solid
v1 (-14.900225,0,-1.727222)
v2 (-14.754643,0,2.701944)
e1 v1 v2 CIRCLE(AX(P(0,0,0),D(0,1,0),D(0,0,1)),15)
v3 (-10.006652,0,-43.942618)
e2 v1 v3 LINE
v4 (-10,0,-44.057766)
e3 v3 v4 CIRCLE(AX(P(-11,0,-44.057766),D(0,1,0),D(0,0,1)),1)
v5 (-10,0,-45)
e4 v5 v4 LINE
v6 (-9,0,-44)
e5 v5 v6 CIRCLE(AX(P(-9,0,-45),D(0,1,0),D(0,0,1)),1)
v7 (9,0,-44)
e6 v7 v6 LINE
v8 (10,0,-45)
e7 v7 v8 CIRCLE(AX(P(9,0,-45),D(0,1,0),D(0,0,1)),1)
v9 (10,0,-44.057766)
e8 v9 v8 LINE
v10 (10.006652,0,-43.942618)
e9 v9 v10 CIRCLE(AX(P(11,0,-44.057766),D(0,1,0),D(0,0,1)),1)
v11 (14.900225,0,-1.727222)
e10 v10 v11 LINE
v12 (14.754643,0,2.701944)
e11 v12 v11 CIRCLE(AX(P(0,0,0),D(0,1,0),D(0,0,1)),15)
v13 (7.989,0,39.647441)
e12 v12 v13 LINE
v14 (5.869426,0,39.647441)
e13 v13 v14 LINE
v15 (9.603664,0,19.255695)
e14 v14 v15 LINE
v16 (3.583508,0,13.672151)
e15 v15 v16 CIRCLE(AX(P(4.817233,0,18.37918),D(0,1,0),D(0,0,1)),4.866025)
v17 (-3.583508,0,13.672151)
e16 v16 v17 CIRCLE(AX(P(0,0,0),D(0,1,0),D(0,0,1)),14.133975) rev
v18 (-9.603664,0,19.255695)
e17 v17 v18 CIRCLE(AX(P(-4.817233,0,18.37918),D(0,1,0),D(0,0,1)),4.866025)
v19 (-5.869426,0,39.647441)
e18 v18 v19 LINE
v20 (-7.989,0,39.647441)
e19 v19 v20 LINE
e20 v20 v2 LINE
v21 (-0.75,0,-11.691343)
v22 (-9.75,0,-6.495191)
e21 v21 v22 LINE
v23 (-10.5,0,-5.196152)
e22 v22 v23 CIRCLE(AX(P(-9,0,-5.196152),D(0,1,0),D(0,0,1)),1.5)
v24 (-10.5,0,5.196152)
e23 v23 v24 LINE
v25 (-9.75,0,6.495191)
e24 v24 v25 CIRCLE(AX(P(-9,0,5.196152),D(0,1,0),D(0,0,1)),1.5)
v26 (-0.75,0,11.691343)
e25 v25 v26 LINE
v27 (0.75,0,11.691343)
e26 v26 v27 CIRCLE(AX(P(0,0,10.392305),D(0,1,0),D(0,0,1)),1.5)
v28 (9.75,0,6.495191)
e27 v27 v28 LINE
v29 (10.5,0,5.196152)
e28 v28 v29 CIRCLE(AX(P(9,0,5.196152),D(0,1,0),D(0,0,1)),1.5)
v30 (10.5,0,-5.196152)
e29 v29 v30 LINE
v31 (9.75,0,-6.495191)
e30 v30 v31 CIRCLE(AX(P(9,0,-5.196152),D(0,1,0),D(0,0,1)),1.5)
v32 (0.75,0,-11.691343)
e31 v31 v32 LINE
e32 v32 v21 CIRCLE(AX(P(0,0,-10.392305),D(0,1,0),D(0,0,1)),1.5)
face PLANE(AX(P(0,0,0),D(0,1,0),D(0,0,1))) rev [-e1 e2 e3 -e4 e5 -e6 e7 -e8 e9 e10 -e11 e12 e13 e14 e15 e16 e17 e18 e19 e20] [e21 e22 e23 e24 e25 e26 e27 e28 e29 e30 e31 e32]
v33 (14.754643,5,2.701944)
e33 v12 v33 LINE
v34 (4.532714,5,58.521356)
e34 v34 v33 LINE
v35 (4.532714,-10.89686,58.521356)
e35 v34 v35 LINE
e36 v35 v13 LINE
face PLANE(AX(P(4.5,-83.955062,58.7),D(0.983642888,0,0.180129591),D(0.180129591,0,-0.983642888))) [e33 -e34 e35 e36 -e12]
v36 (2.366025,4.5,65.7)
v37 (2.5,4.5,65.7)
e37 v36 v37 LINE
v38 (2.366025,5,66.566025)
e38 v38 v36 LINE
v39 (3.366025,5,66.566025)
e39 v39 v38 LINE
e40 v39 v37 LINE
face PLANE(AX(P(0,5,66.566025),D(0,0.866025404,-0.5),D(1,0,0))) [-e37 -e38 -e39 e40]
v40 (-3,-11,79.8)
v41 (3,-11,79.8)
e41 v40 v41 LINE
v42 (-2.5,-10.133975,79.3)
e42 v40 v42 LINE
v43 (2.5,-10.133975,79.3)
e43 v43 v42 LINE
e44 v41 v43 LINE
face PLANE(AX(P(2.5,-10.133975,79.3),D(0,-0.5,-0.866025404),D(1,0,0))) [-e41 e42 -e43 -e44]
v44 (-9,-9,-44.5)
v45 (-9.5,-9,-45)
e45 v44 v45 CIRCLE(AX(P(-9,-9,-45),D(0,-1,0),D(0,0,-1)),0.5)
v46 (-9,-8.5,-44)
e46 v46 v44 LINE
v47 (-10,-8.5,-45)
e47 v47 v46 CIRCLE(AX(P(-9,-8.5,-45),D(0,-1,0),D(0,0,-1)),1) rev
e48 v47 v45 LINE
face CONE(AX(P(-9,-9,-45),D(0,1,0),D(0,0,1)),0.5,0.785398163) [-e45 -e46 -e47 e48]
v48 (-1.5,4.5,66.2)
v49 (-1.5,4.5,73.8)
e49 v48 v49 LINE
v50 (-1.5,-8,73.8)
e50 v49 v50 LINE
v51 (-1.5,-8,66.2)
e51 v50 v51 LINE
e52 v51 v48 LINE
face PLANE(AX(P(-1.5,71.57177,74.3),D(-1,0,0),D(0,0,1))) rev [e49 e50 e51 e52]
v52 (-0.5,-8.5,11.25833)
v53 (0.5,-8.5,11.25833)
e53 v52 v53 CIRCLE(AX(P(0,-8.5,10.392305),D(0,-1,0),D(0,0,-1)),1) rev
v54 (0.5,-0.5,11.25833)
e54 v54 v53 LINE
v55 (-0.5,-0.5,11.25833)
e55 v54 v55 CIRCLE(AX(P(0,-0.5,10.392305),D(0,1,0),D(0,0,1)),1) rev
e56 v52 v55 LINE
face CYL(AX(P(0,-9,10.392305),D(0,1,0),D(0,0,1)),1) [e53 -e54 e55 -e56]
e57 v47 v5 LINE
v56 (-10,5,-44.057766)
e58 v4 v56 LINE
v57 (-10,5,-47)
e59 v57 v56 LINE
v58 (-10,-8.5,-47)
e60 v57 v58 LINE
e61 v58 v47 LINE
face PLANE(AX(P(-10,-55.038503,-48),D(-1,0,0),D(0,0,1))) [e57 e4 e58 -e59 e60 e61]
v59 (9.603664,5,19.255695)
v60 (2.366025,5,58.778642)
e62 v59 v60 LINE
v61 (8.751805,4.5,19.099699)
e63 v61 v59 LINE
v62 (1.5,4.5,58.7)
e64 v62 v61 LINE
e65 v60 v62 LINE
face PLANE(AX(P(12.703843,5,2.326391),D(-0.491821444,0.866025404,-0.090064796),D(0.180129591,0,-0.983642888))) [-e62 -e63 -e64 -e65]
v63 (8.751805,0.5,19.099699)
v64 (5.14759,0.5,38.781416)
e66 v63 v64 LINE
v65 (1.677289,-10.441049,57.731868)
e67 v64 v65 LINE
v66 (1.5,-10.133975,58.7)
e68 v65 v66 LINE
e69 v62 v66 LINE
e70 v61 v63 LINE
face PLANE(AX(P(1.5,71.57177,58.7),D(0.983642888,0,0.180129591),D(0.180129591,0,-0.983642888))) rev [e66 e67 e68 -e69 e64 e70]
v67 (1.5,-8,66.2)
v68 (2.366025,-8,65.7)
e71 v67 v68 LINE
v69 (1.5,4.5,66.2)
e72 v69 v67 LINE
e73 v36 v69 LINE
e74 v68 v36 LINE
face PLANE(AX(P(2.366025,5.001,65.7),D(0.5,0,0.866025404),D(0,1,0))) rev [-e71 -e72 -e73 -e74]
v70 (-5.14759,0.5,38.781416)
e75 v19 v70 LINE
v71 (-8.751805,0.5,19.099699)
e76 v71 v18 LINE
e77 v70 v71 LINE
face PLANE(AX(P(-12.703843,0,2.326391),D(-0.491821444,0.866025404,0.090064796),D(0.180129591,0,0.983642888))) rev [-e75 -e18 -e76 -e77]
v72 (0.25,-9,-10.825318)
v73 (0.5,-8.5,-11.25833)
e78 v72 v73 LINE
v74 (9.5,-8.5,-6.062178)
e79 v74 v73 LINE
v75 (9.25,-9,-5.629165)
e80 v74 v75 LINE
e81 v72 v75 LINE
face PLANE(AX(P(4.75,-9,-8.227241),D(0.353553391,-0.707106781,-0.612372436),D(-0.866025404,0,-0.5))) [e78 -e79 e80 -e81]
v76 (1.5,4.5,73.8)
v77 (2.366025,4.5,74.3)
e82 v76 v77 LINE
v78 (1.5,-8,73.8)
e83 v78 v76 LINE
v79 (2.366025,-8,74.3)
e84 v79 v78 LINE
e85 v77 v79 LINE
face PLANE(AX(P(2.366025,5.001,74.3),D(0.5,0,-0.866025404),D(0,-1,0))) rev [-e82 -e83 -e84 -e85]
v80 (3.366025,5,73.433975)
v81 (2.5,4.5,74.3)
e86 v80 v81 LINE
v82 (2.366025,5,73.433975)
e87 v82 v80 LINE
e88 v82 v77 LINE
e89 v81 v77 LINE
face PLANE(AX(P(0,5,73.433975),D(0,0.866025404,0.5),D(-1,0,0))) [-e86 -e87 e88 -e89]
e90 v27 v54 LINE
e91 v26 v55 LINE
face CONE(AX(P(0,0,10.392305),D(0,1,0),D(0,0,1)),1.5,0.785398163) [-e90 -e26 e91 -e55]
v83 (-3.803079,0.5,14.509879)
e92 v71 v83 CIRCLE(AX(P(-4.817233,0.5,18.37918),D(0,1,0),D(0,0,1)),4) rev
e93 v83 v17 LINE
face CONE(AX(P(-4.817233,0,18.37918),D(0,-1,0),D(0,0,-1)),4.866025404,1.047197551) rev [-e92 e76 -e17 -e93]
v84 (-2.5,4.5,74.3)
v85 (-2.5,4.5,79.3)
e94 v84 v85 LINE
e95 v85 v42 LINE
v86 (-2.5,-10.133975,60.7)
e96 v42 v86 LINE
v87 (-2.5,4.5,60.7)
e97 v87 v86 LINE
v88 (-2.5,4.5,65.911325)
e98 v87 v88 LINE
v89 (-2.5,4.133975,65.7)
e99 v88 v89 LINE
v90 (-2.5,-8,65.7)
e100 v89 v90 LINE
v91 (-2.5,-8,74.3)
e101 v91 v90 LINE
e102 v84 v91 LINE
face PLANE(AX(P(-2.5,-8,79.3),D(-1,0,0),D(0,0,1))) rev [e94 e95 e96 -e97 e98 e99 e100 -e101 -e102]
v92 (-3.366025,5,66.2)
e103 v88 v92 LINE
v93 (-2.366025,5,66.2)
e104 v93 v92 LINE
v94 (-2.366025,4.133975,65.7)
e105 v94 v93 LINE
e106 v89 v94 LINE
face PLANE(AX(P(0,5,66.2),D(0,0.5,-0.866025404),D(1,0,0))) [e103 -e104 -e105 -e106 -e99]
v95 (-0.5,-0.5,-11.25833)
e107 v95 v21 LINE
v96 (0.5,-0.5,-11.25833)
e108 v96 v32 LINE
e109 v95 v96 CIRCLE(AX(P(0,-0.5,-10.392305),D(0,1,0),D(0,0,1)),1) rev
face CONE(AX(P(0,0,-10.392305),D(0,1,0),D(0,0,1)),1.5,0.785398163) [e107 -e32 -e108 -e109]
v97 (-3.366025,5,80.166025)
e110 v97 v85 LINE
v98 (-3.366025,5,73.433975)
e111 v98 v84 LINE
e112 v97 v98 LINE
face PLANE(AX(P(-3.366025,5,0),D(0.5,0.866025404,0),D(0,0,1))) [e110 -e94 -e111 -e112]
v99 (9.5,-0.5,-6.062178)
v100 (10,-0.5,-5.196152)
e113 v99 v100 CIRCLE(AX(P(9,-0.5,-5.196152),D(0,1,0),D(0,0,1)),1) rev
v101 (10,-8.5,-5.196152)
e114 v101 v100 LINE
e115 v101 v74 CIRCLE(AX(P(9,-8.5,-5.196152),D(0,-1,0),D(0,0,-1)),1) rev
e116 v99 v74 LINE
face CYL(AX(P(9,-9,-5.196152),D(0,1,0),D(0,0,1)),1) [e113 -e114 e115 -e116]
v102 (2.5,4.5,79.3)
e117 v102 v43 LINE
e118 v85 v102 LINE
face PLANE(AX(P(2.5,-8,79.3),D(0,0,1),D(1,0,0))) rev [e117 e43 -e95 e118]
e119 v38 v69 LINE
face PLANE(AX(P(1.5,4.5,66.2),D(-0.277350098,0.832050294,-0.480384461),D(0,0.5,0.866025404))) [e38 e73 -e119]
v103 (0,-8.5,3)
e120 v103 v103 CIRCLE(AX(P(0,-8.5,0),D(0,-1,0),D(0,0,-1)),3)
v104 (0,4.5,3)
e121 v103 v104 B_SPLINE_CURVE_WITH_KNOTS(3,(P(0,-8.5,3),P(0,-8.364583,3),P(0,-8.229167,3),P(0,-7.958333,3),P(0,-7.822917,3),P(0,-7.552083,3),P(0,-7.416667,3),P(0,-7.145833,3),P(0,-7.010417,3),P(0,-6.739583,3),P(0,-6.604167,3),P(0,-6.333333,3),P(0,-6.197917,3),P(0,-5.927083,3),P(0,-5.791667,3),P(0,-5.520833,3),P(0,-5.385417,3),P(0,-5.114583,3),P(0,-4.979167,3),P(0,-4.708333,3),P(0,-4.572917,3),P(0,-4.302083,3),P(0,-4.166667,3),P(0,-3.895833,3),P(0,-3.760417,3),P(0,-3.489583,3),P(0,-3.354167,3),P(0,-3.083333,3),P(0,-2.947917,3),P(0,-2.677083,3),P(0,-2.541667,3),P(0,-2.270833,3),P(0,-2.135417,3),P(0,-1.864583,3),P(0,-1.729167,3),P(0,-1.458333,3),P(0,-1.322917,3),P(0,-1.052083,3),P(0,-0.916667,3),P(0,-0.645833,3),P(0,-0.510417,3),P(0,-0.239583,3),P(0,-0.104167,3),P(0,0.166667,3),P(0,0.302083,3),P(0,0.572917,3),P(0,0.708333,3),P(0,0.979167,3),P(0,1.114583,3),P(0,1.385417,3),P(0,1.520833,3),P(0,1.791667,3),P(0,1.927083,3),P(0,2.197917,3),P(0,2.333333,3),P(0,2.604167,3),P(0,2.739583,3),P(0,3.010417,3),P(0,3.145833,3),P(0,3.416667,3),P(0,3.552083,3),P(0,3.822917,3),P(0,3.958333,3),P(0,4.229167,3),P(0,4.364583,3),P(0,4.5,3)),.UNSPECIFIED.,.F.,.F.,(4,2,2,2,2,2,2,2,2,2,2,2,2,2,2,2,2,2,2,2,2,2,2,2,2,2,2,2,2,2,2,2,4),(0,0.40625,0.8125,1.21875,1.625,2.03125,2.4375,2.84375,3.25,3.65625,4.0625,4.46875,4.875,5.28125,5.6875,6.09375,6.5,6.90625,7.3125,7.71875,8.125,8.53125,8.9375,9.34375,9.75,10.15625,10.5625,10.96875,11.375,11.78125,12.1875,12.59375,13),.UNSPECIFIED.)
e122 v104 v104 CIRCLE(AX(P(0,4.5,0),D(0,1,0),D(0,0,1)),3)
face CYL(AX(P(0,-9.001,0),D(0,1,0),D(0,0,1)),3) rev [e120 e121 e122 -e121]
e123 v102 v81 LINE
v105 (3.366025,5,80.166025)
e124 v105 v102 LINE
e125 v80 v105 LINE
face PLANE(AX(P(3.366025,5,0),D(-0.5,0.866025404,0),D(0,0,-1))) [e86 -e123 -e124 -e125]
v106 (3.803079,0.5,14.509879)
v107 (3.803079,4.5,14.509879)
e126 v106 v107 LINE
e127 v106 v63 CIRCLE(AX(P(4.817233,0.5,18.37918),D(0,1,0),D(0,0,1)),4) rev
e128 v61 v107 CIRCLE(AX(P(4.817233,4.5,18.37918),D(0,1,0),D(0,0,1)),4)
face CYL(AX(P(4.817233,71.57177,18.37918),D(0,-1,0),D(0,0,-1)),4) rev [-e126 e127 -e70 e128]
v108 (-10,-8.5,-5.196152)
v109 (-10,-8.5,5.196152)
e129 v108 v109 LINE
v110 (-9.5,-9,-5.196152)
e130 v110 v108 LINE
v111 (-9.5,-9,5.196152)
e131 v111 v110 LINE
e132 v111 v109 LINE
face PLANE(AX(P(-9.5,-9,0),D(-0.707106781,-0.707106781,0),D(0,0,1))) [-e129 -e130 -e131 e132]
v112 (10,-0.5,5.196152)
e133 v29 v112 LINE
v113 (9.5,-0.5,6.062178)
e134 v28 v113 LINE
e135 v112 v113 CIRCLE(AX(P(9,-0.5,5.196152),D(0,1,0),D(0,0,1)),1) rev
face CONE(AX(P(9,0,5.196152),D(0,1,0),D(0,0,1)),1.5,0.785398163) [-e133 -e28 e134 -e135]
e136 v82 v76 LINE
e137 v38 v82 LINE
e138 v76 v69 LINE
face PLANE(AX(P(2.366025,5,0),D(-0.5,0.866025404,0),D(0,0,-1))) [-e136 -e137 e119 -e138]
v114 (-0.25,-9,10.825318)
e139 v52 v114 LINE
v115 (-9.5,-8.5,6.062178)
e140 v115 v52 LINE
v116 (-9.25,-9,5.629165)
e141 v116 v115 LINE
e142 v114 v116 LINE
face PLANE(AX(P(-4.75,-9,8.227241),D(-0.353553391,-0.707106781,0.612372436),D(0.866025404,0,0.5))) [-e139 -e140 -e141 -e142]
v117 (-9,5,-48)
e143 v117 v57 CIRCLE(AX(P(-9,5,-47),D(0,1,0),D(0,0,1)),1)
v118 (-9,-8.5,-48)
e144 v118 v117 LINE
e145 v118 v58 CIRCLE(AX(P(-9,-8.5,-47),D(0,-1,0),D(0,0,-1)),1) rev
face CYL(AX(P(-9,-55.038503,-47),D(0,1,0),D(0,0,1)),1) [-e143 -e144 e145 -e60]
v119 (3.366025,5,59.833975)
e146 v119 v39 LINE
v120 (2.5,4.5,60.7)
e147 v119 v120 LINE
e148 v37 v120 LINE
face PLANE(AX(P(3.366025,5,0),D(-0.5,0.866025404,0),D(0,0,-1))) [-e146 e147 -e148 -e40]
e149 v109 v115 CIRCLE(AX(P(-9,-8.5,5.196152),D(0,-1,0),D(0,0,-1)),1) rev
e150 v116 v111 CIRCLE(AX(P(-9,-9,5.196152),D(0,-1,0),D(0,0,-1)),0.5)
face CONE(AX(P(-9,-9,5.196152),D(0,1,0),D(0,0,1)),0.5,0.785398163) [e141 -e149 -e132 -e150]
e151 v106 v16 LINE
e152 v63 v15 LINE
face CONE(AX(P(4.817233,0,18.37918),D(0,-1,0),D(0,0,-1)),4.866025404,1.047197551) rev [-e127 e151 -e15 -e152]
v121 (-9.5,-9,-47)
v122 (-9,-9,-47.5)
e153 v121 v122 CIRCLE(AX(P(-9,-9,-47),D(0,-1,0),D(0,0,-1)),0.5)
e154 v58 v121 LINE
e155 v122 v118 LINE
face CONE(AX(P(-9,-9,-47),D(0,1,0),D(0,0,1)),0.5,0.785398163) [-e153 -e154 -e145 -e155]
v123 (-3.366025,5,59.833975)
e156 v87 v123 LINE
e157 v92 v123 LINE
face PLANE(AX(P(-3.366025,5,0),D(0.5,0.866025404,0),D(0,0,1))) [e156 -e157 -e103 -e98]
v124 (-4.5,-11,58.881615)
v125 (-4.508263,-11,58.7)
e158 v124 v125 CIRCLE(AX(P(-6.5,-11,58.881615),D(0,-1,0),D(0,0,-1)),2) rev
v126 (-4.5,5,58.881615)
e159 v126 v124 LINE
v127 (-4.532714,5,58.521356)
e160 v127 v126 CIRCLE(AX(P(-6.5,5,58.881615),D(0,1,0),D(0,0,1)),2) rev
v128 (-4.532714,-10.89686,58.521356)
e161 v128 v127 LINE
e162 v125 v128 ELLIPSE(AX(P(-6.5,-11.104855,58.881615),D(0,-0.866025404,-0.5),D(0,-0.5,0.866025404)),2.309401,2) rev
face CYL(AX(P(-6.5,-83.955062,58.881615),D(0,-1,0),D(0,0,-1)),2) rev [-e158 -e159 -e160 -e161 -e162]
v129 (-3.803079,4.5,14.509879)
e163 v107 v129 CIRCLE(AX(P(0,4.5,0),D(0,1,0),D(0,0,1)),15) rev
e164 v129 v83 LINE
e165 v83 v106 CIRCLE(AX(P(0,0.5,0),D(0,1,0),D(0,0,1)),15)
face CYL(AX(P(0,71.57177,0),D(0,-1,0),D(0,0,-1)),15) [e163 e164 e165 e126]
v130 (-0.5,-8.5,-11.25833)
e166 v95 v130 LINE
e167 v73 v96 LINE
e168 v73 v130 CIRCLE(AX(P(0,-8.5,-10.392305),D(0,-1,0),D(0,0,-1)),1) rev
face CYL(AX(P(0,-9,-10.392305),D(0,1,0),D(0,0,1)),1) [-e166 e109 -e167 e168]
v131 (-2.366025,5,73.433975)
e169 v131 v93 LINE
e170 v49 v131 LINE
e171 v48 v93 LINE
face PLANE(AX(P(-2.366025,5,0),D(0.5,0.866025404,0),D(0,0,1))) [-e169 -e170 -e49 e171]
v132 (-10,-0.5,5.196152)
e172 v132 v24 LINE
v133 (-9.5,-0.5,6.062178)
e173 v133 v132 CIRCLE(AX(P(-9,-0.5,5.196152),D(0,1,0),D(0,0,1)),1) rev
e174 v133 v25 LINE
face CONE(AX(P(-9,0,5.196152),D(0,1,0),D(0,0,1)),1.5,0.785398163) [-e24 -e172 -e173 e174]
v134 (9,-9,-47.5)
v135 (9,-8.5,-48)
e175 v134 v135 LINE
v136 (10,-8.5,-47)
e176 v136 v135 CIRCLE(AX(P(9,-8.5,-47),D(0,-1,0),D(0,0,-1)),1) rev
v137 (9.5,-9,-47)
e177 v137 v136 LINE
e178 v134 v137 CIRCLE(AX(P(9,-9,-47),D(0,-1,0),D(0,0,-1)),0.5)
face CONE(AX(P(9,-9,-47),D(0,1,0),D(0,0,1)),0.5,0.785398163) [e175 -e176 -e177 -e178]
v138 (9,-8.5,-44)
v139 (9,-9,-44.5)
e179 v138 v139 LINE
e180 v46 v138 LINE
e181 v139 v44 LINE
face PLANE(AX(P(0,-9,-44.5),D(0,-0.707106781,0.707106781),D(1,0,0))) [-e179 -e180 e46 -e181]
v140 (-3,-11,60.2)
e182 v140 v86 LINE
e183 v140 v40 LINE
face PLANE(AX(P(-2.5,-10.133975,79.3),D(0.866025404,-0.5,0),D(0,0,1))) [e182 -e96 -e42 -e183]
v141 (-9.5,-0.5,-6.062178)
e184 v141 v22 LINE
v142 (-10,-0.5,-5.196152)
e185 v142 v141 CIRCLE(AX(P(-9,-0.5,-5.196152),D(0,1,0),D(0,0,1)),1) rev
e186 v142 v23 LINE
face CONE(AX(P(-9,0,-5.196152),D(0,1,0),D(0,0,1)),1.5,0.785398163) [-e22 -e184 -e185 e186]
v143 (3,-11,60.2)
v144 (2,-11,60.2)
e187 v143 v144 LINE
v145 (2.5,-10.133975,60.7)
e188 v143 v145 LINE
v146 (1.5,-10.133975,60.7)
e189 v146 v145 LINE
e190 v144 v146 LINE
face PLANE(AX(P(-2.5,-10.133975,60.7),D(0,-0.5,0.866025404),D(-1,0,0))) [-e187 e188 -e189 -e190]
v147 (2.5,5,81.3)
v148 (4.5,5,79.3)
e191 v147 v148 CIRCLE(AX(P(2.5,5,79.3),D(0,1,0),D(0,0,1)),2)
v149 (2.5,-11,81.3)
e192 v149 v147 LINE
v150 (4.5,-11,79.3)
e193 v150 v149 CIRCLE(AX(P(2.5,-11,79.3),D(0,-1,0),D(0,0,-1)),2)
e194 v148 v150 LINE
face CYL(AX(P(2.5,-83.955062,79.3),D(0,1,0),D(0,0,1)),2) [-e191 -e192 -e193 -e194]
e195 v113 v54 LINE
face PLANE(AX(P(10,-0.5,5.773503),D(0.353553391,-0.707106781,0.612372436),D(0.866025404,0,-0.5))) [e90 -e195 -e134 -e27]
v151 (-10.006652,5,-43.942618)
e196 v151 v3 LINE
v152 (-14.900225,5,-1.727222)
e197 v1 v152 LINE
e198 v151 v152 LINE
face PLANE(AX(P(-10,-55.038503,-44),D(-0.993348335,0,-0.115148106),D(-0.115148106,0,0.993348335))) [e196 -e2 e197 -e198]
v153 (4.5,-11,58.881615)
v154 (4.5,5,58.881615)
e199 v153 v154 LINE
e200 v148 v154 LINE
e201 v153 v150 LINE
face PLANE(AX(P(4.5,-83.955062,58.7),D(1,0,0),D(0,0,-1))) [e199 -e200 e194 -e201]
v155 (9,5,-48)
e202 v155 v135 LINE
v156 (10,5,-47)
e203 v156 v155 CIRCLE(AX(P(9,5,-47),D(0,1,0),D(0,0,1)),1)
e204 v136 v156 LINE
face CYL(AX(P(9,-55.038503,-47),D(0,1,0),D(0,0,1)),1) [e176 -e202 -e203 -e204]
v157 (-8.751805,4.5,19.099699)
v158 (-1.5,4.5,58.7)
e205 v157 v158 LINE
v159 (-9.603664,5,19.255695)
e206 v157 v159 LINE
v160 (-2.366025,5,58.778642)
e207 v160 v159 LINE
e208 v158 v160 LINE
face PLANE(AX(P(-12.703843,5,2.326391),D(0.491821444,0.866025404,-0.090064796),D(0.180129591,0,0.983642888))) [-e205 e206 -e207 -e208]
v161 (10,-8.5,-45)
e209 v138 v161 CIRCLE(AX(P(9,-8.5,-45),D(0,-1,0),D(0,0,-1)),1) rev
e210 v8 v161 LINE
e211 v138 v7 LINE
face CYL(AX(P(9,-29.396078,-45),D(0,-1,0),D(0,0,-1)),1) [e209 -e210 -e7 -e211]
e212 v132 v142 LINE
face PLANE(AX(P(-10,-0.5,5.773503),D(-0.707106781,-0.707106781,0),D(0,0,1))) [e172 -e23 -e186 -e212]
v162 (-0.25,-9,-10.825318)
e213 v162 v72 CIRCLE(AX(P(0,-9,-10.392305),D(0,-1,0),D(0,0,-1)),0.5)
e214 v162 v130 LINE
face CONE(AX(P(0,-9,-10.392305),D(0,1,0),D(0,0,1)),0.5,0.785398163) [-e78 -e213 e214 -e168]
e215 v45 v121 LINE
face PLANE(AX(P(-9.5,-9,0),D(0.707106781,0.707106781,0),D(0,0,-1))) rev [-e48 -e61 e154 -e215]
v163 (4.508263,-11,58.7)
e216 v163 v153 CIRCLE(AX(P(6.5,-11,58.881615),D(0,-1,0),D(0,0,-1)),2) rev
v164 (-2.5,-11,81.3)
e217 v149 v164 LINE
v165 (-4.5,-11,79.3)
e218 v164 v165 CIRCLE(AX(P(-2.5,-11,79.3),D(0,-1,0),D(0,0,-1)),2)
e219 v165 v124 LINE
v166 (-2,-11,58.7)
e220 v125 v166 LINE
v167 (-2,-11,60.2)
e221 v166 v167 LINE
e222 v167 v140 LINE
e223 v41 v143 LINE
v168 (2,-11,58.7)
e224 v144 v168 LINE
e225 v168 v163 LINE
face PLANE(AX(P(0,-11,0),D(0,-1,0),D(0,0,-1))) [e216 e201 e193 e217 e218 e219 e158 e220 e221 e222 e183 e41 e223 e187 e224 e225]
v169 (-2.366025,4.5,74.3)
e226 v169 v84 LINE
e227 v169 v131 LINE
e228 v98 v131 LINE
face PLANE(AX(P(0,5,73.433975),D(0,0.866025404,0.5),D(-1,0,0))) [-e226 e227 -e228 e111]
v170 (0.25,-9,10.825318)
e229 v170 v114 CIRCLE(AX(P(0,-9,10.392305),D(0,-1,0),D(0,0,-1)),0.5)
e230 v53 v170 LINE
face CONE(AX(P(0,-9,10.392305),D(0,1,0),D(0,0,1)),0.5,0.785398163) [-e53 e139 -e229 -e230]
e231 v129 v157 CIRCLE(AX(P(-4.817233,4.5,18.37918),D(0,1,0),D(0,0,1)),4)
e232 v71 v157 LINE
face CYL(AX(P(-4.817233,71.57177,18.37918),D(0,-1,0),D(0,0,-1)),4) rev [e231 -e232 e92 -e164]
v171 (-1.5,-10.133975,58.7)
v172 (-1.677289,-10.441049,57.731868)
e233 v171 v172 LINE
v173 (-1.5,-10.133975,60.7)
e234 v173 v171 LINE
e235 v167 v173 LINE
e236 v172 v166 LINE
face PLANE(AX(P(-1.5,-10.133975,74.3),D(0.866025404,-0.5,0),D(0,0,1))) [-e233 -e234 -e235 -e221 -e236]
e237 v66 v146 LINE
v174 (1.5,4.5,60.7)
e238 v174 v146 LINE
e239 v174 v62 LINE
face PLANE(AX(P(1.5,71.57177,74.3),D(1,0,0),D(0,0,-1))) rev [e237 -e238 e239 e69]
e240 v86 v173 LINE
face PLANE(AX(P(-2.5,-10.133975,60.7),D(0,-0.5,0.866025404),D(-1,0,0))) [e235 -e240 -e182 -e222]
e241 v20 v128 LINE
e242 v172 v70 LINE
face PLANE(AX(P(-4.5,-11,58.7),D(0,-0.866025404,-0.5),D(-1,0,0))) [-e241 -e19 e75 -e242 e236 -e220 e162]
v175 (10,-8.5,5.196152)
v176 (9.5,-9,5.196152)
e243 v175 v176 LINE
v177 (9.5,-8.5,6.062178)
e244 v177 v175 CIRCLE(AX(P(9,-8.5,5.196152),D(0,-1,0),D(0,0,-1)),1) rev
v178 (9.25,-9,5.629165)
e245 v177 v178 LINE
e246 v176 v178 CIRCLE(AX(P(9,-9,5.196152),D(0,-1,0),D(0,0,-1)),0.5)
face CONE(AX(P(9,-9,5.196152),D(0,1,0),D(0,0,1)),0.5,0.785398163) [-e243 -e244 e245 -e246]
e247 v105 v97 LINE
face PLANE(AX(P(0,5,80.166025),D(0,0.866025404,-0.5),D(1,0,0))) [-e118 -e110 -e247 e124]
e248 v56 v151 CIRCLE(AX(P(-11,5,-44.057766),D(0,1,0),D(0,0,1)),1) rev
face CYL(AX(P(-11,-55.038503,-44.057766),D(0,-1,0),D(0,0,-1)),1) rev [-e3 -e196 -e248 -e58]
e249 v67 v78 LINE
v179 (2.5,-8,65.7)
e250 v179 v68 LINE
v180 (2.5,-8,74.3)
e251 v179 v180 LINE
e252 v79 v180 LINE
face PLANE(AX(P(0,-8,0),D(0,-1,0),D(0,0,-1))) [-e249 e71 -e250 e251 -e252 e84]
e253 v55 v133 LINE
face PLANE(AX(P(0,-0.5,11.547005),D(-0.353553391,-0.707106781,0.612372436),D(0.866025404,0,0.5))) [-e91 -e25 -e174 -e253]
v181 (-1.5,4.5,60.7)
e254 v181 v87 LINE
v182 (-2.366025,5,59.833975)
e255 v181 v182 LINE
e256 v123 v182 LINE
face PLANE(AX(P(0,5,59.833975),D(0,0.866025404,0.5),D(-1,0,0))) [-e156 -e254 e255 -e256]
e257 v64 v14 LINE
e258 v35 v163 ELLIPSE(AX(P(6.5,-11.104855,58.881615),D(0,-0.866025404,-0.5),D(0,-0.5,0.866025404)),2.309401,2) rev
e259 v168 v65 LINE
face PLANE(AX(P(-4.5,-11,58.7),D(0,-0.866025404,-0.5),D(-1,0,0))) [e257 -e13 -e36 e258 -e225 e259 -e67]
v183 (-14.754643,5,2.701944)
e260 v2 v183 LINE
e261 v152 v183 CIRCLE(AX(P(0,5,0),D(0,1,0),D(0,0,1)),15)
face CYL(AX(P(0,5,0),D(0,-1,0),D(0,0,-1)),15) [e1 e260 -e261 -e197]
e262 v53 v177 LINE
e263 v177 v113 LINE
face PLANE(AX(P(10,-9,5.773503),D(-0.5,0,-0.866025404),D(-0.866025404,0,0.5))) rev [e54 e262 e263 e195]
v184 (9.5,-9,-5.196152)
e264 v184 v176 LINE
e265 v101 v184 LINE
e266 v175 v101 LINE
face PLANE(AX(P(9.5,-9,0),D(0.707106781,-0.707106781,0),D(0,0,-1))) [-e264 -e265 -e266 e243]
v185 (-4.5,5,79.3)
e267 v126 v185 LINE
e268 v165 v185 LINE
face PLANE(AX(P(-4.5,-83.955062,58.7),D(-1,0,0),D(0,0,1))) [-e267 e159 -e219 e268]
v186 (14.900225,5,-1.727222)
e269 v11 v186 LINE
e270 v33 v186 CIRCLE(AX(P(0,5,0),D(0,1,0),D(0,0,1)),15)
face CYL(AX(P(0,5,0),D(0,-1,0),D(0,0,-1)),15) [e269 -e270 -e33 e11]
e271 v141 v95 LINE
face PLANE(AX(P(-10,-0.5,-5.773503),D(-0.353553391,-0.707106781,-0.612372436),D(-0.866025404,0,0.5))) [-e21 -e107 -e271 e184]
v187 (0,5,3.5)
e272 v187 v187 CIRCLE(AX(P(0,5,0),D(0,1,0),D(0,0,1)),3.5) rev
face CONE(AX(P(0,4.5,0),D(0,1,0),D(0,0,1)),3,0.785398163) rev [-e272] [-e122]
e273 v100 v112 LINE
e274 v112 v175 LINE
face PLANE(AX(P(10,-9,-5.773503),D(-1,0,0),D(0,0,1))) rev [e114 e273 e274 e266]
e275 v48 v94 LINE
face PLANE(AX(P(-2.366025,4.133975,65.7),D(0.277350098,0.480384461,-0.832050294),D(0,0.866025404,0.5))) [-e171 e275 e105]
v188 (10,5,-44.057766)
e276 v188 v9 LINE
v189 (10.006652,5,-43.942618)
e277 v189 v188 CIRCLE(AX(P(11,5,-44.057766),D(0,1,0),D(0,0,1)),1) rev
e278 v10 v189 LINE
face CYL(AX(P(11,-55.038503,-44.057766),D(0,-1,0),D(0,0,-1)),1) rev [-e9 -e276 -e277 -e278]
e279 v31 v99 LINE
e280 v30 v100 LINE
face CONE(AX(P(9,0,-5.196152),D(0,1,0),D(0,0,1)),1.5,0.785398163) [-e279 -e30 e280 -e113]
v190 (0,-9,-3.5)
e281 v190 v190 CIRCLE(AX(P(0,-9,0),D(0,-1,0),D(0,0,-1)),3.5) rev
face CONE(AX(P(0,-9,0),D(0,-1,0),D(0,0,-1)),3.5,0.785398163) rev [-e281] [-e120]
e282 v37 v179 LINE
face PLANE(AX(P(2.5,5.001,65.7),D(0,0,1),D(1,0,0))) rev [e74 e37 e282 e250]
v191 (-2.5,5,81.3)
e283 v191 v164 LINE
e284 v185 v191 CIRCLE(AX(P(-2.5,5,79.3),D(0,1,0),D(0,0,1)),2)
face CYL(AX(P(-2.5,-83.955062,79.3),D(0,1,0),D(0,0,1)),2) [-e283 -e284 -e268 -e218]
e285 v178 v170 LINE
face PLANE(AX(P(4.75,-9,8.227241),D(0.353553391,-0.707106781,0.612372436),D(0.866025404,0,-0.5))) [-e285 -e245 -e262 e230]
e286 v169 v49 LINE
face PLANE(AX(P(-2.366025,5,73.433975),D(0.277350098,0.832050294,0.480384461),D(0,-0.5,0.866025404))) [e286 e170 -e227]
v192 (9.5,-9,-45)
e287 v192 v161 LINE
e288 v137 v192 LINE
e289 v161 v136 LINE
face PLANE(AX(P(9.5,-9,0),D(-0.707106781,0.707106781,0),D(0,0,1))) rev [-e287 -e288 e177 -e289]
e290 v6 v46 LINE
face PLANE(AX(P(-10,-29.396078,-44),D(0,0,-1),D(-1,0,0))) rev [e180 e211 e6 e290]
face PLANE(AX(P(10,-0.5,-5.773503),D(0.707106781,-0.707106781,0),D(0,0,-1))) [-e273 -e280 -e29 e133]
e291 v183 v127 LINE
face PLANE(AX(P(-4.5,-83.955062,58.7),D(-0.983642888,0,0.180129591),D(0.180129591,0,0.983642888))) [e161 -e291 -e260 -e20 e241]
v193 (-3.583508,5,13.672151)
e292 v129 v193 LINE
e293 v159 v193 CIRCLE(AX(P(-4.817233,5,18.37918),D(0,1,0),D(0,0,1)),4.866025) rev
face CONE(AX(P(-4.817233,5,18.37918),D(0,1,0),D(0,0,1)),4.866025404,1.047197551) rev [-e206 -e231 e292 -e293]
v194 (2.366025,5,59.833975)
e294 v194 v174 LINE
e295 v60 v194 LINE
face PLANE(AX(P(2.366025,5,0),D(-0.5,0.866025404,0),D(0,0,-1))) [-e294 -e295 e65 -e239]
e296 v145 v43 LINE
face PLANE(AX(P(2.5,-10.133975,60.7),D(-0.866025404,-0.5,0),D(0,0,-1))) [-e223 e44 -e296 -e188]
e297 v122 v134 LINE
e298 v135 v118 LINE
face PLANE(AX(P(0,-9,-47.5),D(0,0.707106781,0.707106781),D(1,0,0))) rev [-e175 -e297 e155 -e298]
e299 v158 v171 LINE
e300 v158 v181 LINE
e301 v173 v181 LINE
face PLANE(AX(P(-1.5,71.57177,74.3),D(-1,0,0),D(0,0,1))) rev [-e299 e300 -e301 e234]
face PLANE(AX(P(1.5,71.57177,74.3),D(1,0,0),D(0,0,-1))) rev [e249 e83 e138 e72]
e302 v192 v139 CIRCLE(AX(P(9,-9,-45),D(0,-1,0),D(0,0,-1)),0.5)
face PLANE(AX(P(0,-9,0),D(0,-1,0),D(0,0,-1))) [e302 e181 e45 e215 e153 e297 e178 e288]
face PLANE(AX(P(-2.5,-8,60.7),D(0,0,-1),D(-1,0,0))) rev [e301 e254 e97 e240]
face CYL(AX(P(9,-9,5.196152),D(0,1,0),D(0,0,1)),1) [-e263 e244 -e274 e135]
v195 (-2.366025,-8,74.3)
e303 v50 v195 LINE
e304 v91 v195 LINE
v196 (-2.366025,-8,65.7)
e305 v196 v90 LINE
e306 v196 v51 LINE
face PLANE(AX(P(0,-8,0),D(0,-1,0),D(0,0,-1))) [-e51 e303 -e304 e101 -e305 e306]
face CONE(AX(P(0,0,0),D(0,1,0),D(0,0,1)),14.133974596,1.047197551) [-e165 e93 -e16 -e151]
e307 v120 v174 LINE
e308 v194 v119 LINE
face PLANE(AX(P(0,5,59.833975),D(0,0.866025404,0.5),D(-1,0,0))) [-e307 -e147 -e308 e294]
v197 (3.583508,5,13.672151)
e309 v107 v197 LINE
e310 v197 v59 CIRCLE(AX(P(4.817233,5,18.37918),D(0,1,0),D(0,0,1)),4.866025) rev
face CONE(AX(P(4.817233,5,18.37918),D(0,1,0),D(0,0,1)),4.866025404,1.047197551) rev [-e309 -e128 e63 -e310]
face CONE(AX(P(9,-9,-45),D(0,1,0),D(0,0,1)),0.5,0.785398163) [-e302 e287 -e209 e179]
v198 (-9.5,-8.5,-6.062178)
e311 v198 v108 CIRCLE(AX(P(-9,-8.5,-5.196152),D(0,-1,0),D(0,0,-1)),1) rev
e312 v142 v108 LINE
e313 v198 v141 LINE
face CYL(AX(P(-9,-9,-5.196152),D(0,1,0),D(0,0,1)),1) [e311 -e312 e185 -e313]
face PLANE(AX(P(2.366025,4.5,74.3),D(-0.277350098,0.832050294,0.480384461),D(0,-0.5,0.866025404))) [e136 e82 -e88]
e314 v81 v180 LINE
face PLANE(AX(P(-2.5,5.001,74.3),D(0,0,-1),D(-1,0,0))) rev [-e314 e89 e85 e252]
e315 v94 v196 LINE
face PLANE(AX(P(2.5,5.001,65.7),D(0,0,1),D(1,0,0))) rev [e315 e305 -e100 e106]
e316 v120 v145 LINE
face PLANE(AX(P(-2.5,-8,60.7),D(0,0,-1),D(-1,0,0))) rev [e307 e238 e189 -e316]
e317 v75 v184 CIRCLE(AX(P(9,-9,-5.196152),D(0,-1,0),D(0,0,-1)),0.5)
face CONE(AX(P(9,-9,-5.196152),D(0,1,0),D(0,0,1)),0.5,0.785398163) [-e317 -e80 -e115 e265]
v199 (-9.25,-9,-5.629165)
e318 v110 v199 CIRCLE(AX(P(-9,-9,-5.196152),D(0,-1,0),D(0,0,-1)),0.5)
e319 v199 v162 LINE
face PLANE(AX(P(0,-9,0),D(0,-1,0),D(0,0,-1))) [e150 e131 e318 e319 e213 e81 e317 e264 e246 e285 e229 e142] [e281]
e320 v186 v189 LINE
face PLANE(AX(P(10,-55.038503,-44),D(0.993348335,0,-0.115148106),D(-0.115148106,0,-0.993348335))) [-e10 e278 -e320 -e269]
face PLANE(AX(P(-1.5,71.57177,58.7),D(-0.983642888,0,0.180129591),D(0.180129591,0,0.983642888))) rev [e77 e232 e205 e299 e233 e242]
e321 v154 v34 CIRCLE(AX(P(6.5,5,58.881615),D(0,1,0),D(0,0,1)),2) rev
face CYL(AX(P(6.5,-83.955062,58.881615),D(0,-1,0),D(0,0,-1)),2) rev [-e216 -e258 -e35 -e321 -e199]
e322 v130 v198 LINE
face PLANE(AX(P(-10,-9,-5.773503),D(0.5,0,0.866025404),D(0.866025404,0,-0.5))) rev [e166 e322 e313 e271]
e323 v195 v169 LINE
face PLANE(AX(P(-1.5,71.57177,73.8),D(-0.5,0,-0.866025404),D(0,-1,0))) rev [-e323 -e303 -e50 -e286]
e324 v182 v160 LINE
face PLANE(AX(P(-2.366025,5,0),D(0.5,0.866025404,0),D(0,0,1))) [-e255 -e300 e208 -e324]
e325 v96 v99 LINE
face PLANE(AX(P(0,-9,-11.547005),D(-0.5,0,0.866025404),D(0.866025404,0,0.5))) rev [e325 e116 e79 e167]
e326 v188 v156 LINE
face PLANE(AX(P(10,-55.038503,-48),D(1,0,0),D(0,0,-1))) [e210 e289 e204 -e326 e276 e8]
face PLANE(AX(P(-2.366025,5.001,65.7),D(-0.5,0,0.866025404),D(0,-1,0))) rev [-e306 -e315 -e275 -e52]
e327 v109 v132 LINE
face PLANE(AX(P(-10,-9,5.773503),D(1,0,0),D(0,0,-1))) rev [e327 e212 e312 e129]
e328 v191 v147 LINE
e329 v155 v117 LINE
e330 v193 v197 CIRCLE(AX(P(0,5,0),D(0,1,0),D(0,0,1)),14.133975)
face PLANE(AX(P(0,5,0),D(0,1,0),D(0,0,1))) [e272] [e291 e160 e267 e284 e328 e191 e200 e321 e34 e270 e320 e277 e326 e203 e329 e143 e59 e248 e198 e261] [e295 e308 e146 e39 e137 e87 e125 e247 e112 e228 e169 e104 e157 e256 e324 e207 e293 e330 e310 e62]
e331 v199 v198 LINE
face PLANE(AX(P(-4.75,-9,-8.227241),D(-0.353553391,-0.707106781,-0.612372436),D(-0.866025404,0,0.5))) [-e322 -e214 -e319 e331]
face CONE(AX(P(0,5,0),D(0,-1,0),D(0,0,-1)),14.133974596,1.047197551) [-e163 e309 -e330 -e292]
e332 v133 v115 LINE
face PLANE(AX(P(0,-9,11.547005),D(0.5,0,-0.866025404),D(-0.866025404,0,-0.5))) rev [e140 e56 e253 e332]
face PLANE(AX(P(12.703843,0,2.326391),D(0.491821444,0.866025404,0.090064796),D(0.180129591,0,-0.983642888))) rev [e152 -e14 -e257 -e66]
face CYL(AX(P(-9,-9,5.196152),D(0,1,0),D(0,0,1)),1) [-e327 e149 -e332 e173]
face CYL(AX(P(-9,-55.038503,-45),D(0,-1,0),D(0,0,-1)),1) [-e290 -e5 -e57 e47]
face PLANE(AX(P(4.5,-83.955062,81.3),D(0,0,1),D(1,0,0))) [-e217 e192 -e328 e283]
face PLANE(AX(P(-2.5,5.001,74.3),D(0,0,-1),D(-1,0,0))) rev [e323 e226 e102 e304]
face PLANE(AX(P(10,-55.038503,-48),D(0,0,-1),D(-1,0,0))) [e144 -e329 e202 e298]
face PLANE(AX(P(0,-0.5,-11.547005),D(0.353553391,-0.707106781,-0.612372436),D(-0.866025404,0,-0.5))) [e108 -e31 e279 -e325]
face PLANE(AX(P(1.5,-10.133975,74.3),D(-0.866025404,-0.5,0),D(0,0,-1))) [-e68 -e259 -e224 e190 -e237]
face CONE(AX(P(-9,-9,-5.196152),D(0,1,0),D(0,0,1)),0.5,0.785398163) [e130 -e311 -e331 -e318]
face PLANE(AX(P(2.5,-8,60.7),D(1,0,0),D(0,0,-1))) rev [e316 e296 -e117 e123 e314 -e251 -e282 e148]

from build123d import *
from OCP.BRepFilletAPI import BRepFilletAPI_MakeChamfer

# Parameters (mm, degrees)
SKETCH1_R           = 15
BOSS_EXTRUDE1_DEPTH = 5
BOSS_EXTRUDE2_DEPTH = 9
CUT_EXTRUDE1_REACH  = 27.417
SKETCH3_R           = 3
FILLET1_R           = 1
CHAMFER1_SIZE       = 0.5
BOSS_EXTRUDE3_START = -5
BOSS_EXTRUDE3_DEPTH = 5
SKETCH5_W           = 20
SKETCH5_H           = 4
BOSS_EXTRUDE4_DEPTH = 9
FILLET2_R           = 1
CHAMFER3_SIZE       = 0.5
FILLET3_R           = 1
BOSS_EXTRUDE5_START = -5
BOSS_EXTRUDE5_DEPTH = 5
SKETCH7_W           = 9
SKETCH7_H           = 22.6
BOSS_EXTRUDE6_DEPTH = 11
SKETCH8_W           = 5
SKETCH8_H           = 18.6
CUT_EXTRUDE2_DEPTH  = 3
CUT_EXTRUDE4_REACH  = 85.688
SKETCH10_W          = 5
SKETCH10_H          = 5
CUT_EXTRUDE5_DEPTH  = 16
CHAMFER5_SIZE       = 19.052558883
CHAMFER5_SIZE_2     = 11
FILLET4_R           = 4
CHAMFER6_SIZE       = 0.5
CHAMFER6_SIZE2      = 0.866025404
FILLET5_R           = 2


with BuildPart() as part:
    # Sketch1 → Boss-Extrude1 (new body)
    with BuildSketch(Plane(origin=(0, 0, 0), x_dir=(1, 0, 0), z_dir=(0, 1, 0))):
        with Locations(Location((0, 0, 0), (0, 0, 270))):
            Circle(SKETCH1_R)
    extrude(amount=BOSS_EXTRUDE1_DEPTH)

    # Sketch2 → Boss-Extrude2 (add)
    with BuildSketch(Plane.XZ):
        Polygon((0, 11.547005384), (-10, 5.773502692), (-10, -5.773502692), (0, -11.547005384), (10, -5.773502692), (10, 5.773502692), align=None)
    extrude(amount=BOSS_EXTRUDE2_DEPTH)

    # Sketch3 → Cut-Extrude1 (cut, up to next)
    with BuildSketch(Plane(origin=(0, 5, 0), x_dir=(1, 0, 0), z_dir=(0, 1, 0)), mode=Mode.PRIVATE) as cut_extrude1_sk1:
        with Locations(Location((0, 0, 0), (0, 0, 270))):
            Circle(SKETCH3_R)
    cut_extrude1_tool1 = extrude(cut_extrude1_sk1.sketch, amount=-CUT_EXTRUDE1_REACH, mode=Mode.PRIVATE) & part.part
    add(cut_extrude1_tool1.solids().sort_by_distance((0, 5, 0))[0], mode=Mode.SUBTRACT)

    # Fillet1
    fillet1_edges = [part.edges().sort_by_distance(p)[0] for p in [
        (10, -4.5, 5.773502692),
        (0, -4.5, 11.547005384),
        (-10, -4.5, 5.773502692),
        (-10, -4.5, -5.773502692),
        (0, -4.5, -11.547005384),
        (10, -4.5, -5.773502692),
    ]]
    fillet(fillet1_edges, radius=FILLET1_R)

    # Chamfer1
    chamfer1_edges = [part.edges().sort_by_distance(p)[0] for p in [
        (0, -9, -3),
        (0, 5, -3),
        (-5, 0, -8.660254038),
        (-5, -9, -8.660254038),
        (-10, 0, 0),
        (-10, -9, 0),
        (5, -9, 8.660254038),
        (-5, -9, 8.660254038),
        (5, -9, -8.660254038),
        (10, -9, 0),
        (-9.866025404, -9, 5.696152423),
        (0, -9, 11.392304845),
        (9.866025404, -9, 5.696152423),
        (9.866025404, -9, -5.696152423),
        (0, -9, -11.392304845),
        (-9.866025404, -9, -5.696152423),
        (5, 0, -8.660254038),
        (10, 0, 0),
        (5, 0, 8.660254038),
        (-5, 0, 8.660254038),
        (-9.866025404, 0, -5.696152423),
        (0, 0, -11.392304845),
        (9.866025404, 0, -5.696152423),
        (9.866025404, 0, 5.696152423),
        (0, 0, 11.392304845),
        (-9.866025404, 0, 5.696152423),
    ]]
    chamfer(chamfer1_edges, length=CHAMFER1_SIZE)

    # Sketch4 → Boss-Extrude3 (add)
    with BuildSketch(Plane(origin=(0, 5, 0), x_dir=(1, 0, 0), z_dir=(0, 1, 0)).offset(BOSS_EXTRUDE3_START)):
        with BuildLine():
            Line((10, 48), (-10, 48))
            Line((-10, 48), (-10, 44))
            Line((-10, 44), (-14.900225018, 1.727221587))
            ThreePointArc((-14.900225018, 1.727221587), (0, 15), (14.900225018, 1.727221587))
            Line((14.900225018, 1.727221587), (10, 44))
            Line((10, 44), (10, 48))
        make_face()
    extrude(amount=BOSS_EXTRUDE3_DEPTH)

    # Sketch5 → Boss-Extrude4 (add)
    with BuildSketch(Plane.XZ):
        with Locations((0, -46)):
            Rectangle(SKETCH5_W, SKETCH5_H)
    extrude(amount=BOSS_EXTRUDE4_DEPTH)

    # Fillet2
    fillet2_edges = [part.edges().sort_by_distance(p)[0] for p in [
        (-10, -2, -48),
        (10, -2, -48),
        (-10, -4.5, -44),
        (10, -4.5, -44),
    ]]
    fillet(fillet2_edges, radius=FILLET2_R)

    # Chamfer3
    chamfer3_edges = [part.edges().sort_by_distance(p)[0] for p in [
        (-10, -9, -46),
        (0, -9, -44),
        (0, -9, -48),
        (10, -9, -46),
        (-9.707106781, -9, -47.707106781),
        (9.707106781, -9, -47.707106781),
        (9.707106781, -9, -44.292893219),
        (-9.707106781, -9, -44.292893219),
    ]]
    chamfer(chamfer3_edges, length=CHAMFER3_SIZE)

    # Fillet3
    fillet3_edges = [part.edges().sort_by_distance(p)[0] for p in [
        (-10, 2.5, -44),
        (10, 2.5, -44),
    ]]
    fillet(fillet3_edges, radius=FILLET3_R)

    # Sketch6 → Boss-Extrude5 (add)
    with BuildSketch(Plane(origin=(0, 5, 0), x_dir=(1, 0, 0), z_dir=(0, 1, 0)).offset(BOSS_EXTRUDE5_START)):
        with BuildLine():
            Line((4.5, -58.7), (4.5, -81.3))
            Line((4.5, -81.3), (-4.5, -81.3))
            Line((-4.5, -81.3), (-4.5, -58.7))
            Line((-4.5, -58.7), (-14.754643314, -2.701943869))
            ThreePointArc((-14.754643314, -2.701943869), (0, -15), (14.754643314, -2.701943869))
            Line((14.754643314, -2.701943869), (4.5, -58.7))
        make_face()
    extrude(amount=BOSS_EXTRUDE5_DEPTH)

    # Sketch7 → Boss-Extrude6 (add)
    with BuildSketch(Plane.XZ):
        with Locations((0, 70)):
            Rectangle(SKETCH7_W, SKETCH7_H)
    extrude(amount=BOSS_EXTRUDE6_DEPTH)

    # Sketch8 → Cut-Extrude2 (cut)
    with BuildSketch(Plane.XZ.offset(11)):
        with Locations((0, 70)):
            Rectangle(SKETCH8_W, SKETCH8_H)
    extrude(amount=-CUT_EXTRUDE2_DEPTH, mode=Mode.SUBTRACT)

    # Sketch10 → Cut-Extrude4 (cut, up to next)
    with BuildSketch(Plane.XZ.offset(8), mode=Mode.PRIVATE) as cut_extrude4_sk1:
        with Locations((0, 76.8)):
            Rectangle(SKETCH10_W, SKETCH10_H)
    cut_extrude4_tool1 = extrude(cut_extrude4_sk1.sketch, amount=-CUT_EXTRUDE4_REACH, mode=Mode.PRIVATE) & part.part
    # Sketch10 → Cut-Extrude4 (cut, up to next)
    with BuildSketch(Plane.XZ.offset(8), mode=Mode.PRIVATE) as cut_extrude4_sk2:
        with Locations((0, 63.2)):
            Rectangle(SKETCH10_W, SKETCH10_H)
    cut_extrude4_tool2 = extrude(cut_extrude4_sk2.sketch, amount=-CUT_EXTRUDE4_REACH, mode=Mode.PRIVATE) & part.part
    add(cut_extrude4_tool1.solids().sort_by_distance((0, -8, 76.8))[0], mode=Mode.SUBTRACT)
    add(cut_extrude4_tool2.solids().sort_by_distance((0, -8, 63.2))[0], mode=Mode.SUBTRACT)

    # Sketch11 → Cut-Extrude5 (cut)
    with BuildSketch(Plane.XZ.offset(11)):
        with BuildLine():
            Line((-1.5, 74.3), (-1.5, 58.7))
            Line((-1.5, 58.7), (-10.24267003, 10.958453844))
            ThreePointArc((-10.24267003, 10.958453844), (0, 15), (10.24267003, 10.958453844))
            Line((10.24267003, 10.958453844), (1.5, 58.7))
            Line((1.5, 58.7), (1.5, 74.3))
            Line((1.5, 74.3), (-1.5, 74.3))
        make_face()
    extrude(amount=-CUT_EXTRUDE5_DEPTH, mode=Mode.SUBTRACT)

    # Chamfer5
    # the kernel refuses this chamfer: 19.052558883, 11 mm, written as the material it adds along each edge
    with BuildSketch(Plane(origin=(47.790603676, 0, 58.7), x_dir=(0, 0.01932676561270063, -0.9998132206222079), z_dir=(-1, 0, 0))) as chamfer5_piece_1_section:
        Polygon((CHAMFER5_SIZE * 0.999813220636, CHAMFER5_SIZE * 0.019326765613), (-CHAMFER5_SIZE_2 * 0.0193267656127, CHAMFER5_SIZE_2 * 0.999813220622), (0, 0), align=None)
    chamfer5_piece_1 = extrude(amount=101.581207353, mode=Mode.PRIVATE)
    chamfer5_piece_1 = split(chamfer5_piece_1, bisect_by=Plane(origin=(6.212258684, -2.756527894, 49.349781279), z_dir=(-0.9836428876173074, 0, -0.18012959123887753)), keep=Keep.TOP, mode=Mode.PRIVATE)
    chamfer5_piece_1 = split(chamfer5_piece_1, bisect_by=Plane(origin=(3.309598693, -2.756527894, 48.818231705), z_dir=(0.9836428876173074, 0, 0.18012959123887784)), keep=Keep.TOP, mode=Mode.PRIVATE)
    add(chamfer5_piece_1)
    with BuildSketch(Plane(origin=(47.790603676, 0, 58.7), x_dir=(0, 0.01932676561270063, -0.9998132206222079), z_dir=(-1, 0, 0))) as chamfer5_piece_2_section:
        Polygon((CHAMFER5_SIZE * 0.999813220636, CHAMFER5_SIZE * 0.019326765613), (-CHAMFER5_SIZE_2 * 0.0193267656127, CHAMFER5_SIZE_2 * 0.999813220622), (0, 0), align=None)
    chamfer5_piece_2 = extrude(amount=101.581207353, mode=Mode.PRIVATE)
    chamfer5_piece_2 = split(chamfer5_piece_2, bisect_by=Plane(origin=(-2.334821756, -4.240286921, 54.141246068), z_dir=(-0.9836428876173074, 0, 0.18012959123887784)), keep=Keep.TOP, mode=Mode.PRIVATE)
    chamfer5_piece_2 = split(chamfer5_piece_2, bisect_by=Plane(origin=(-5.237481747, -4.240286921, 54.672795642), z_dir=(0.9836428876173074, 0, -0.18012959123887773)), keep=Keep.TOP, mode=Mode.PRIVATE)
    add(chamfer5_piece_2)
    with BuildSketch(Plane(origin=(53.790603676, 0, 58.7), x_dir=(0, 0.01932676561270063, -0.9998132206222079), z_dir=(-1, 0, 0))) as chamfer5_piece_3_section:
        Polygon((CHAMFER5_SIZE * 0.999813220636, CHAMFER5_SIZE * 0.019326765613), (-CHAMFER5_SIZE_2 * 0.0193267656127, CHAMFER5_SIZE_2 * 0.999813220622), (0, 0), align=None)
    chamfer5_piece_3 = extrude(amount=101.581207353, mode=Mode.PRIVATE)
    chamfer5_piece_3 = split(chamfer5_piece_3, bisect_by=Plane(origin=(6.212258684, -2.756527894, 49.349781279), z_dir=(-0.9836428876173074, 0, -0.18012959123887753)), keep=Keep.TOP, mode=Mode.PRIVATE)
    chamfer5_piece_3 = split(chamfer5_piece_3, bisect_by=Plane(origin=(3.309598693, -2.756527894, 48.818231705), z_dir=(0.9836428876173074, 0, 0.18012959123887784)), keep=Keep.TOP, mode=Mode.PRIVATE)
    add(chamfer5_piece_3)
    with BuildSketch(Plane(origin=(53.790603676, 0, 58.7), x_dir=(0, 0.01932676561270063, -0.9998132206222079), z_dir=(-1, 0, 0))) as chamfer5_piece_4_section:
        Polygon((CHAMFER5_SIZE * 0.999813220636, CHAMFER5_SIZE * 0.019326765613), (-CHAMFER5_SIZE_2 * 0.0193267656127, CHAMFER5_SIZE_2 * 0.999813220622), (0, 0), align=None)
    chamfer5_piece_4 = extrude(amount=101.581207353, mode=Mode.PRIVATE)
    chamfer5_piece_4 = split(chamfer5_piece_4, bisect_by=Plane(origin=(-2.334821756, -4.240286921, 54.141246068), z_dir=(-0.9836428876173074, 0, 0.18012959123887784)), keep=Keep.TOP, mode=Mode.PRIVATE)
    chamfer5_piece_4 = split(chamfer5_piece_4, bisect_by=Plane(origin=(-5.237481747, -4.240286921, 54.672795642), z_dir=(0.9836428876173074, 0, -0.18012959123887773)), keep=Keep.TOP, mode=Mode.PRIVATE)
    add(chamfer5_piece_4)

    # Fillet4
    fillet4_edges = [part.edges().sort_by_distance(p)[0] for p in [
        (10.24267003, 2.5, 10.958453844),
        (-10.24267003, 2.5, 10.958453844),
    ]]
    fillet(fillet4_edges, radius=FILLET4_R)

    # Chamfer6: one chamfer whose edges measure the first distance from different faces: ONE call of the kernel's chamfer builder (chamfer() names one face for all edges)
    chamfer6_edges_1 = [part.edges().sort_by_distance(p)[0] for p in [
        (0, -11, 79.3),
        (-2.5, -11, 70),
        (-2, -11, 60.7),
        (2.5, -11, 70),
        (2, -11, 60.7),
        (-1.5, -11, 59.7),
        (1.5, -11, 59.7),
    ]]
    chamfer6_side_1 = [part.faces().sort_by_distance(p)[0] for p in [
        (-4.256738823, -11, 70),
    ]]
    chamfer6_edges_2 = [part.edges().sort_by_distance(p)[0] for p in [
        (-2.5, 5, 76.8),
        (-2.5, 5, 63.2),
    ]]
    chamfer6_side_2 = [part.faces().sort_by_distance(p)[0] for p in [
        (-2.5, -3, 79.054651269),
    ]]
    chamfer6_edges_3 = [part.edges().sort_by_distance(p)[0] for p in [
        (0, 5, 79.3),
    ]]
    chamfer6_side_3 = [part.faces().sort_by_distance(p)[0] for p in [
        (0, -3, 79.3),
    ]]
    chamfer6_edges_4 = [part.edges().sort_by_distance(p)[0] for p in [
        (2.5, 5, 76.8),
        (2.5, 5, 63.2),
    ]]
    chamfer6_side_4 = [part.faces().sort_by_distance(p)[0] for p in [
        (2.5, -1.5, 74.545348731),
    ]]
    chamfer6_edges_5 = [part.edges().sort_by_distance(p)[0] for p in [
        (-2, 5, 74.3),
    ]]
    chamfer6_side_5 = [part.faces().sort_by_distance(p)[0] for p in [
        (-2, -1.5, 74.3),
    ]]
    chamfer6_edges_6 = [part.edges().sort_by_distance(p)[0] for p in [
        (-2, 5, 60.7),
    ]]
    chamfer6_side_6 = [part.faces().sort_by_distance(p)[0] for p in [
        (-2, -3, 60.7),
    ]]
    chamfer6_edges_7 = [part.edges().sort_by_distance(p)[0] for p in [
        (2, 5, 65.7),
    ]]
    chamfer6_side_7 = [part.faces().sort_by_distance(p)[0] for p in [
        (2, -1.5, 65.7),
    ]]
    chamfer6_edges_8 = [part.edges().sort_by_distance(p)[0] for p in [
        (2, 5, 74.3),
    ]]
    chamfer6_side_8 = [part.faces().sort_by_distance(p)[0] for p in [
        (2, -1.5, 74.3),
    ]]
    chamfer6_edges_9 = [part.edges().sort_by_distance(p)[0] for p in [
        (-2, 5, 65.7),
    ]]
    chamfer6_side_9 = [part.faces().sort_by_distance(p)[0] for p in [
        (6.431537391, 5, 39.138943683),
    ]]
    chamfer6_edges_10 = [part.edges().sort_by_distance(p)[0] for p in [
        (2, 5, 60.7),
    ]]
    chamfer6_side_10 = [part.faces().sort_by_distance(p)[0] for p in [
        (2, -3, 60.7),
    ]]
    chamfer6_edges_11 = [part.edges().sort_by_distance(p)[0] for p in [
        (-5.125902347, 5, 38.899849283),
        (-6.870402149, 0, 29.373569841),
    ]]
    chamfer6_side_11 = [part.faces().sort_by_distance(p)[0] for p in [
        (-4.273546673, 0.365854061, 43.554351583),
    ]]
    chamfer6_edges_12 = [part.edges().sort_by_distance(p)[0] for p in [
        (-1.5, 5, 59.7),
    ]]
    chamfer6_side_12 = [part.faces().sort_by_distance(p)[0] for p in [
        (-1.5, -3, 59.7),
    ]]
    chamfer6_edges_13 = [part.edges().sort_by_distance(p)[0] for p in [
        (1.5, 5, 59.7),
    ]]
    chamfer6_side_13 = [part.faces().sort_by_distance(p)[0] for p in [
        (1.5, -3, 59.7),
    ]]
    chamfer6_edges_14 = [part.edges().sort_by_distance(p)[0] for p in [
        (-1.5, 5, 70),
        (-1.5, -1.5, 65.7),
        (-1.5, -1.5, 74.3),
    ]]
    chamfer6_side_14 = [part.faces().sort_by_distance(p)[0] for p in [
        (-1.5, -1.5, 70),
    ]]
    chamfer6_edges_15 = [part.edges().sort_by_distance(p)[0] for p in [
        (1.5, -1.5, 65.7),
        (1.5, 5, 70),
        (1.5, -1.5, 74.3),
    ]]
    chamfer6_side_15 = [part.faces().sort_by_distance(p)[0] for p in [
        (1.5, -1.5, 70),
    ]]
    chamfer6_edges_16 = [part.edges().sort_by_distance(p)[0] for p in [
        (6.870402149, 0, 29.373569841),
        (5.125902347, 5, 38.899849283),
    ]]
    chamfer6_side_16 = [part.faces().sort_by_distance(p)[0] for p in [
        (4.273546673, 0.365854061, 43.554351583),
    ]]
    chamfer6_edges_17 = [part.edges().sort_by_distance(p)[0] for p in [
        (0, 5, 15),
        (0, 0, 15),
    ]]
    chamfer6_side_17 = [part.faces().sort_by_distance(p)[0] for p in [
        (0, 2.5, 15),
    ]]
    chamfer6_edges_18 = [part.edges().sort_by_distance(p)[0] for p in [
        (7.537310318, 0, 15.44640333),
        (7.537310318, 5, 15.44640333),
    ]]
    chamfer6_side_18 = [part.faces().sort_by_distance(p)[0] for p in [
        (7.537310318, 2.5, 15.44640333),
    ]]
    chamfer6_edges_19 = [part.edges().sort_by_distance(p)[0] for p in [
        (-7.537310318, 0, 15.44640333),
        (-7.537310318, 5, 15.44640333),
    ]]
    chamfer6_side_19 = [part.faces().sort_by_distance(p)[0] for p in [
        (-7.537310318, 2.5, 15.44640333),
    ]]
    chamfer6 = BRepFilletAPI_MakeChamfer(part.part.solid().wrapped)
    for e in chamfer6_edges_1:
        chamfer6.Add(CHAMFER6_SIZE, CHAMFER6_SIZE2, e.wrapped, chamfer6_side_1[0].wrapped)  # the first distance lies on this face
    for e in chamfer6_edges_2:
        chamfer6.Add(CHAMFER6_SIZE, CHAMFER6_SIZE2, e.wrapped, chamfer6_side_2[0].wrapped)  # the first distance lies on this face
    for e in chamfer6_edges_3:
        chamfer6.Add(CHAMFER6_SIZE, CHAMFER6_SIZE2, e.wrapped, chamfer6_side_3[0].wrapped)  # the first distance lies on this face
    for e in chamfer6_edges_4:
        chamfer6.Add(CHAMFER6_SIZE, CHAMFER6_SIZE2, e.wrapped, chamfer6_side_4[0].wrapped)  # the first distance lies on this face
    for e in chamfer6_edges_5:
        chamfer6.Add(CHAMFER6_SIZE, CHAMFER6_SIZE2, e.wrapped, chamfer6_side_5[0].wrapped)  # the first distance lies on this face
    for e in chamfer6_edges_6:
        chamfer6.Add(CHAMFER6_SIZE, CHAMFER6_SIZE2, e.wrapped, chamfer6_side_6[0].wrapped)  # the first distance lies on this face
    for e in chamfer6_edges_7:
        chamfer6.Add(CHAMFER6_SIZE, CHAMFER6_SIZE2, e.wrapped, chamfer6_side_7[0].wrapped)  # the first distance lies on this face
    for e in chamfer6_edges_8:
        chamfer6.Add(CHAMFER6_SIZE, CHAMFER6_SIZE2, e.wrapped, chamfer6_side_8[0].wrapped)  # the first distance lies on this face
    for e in chamfer6_edges_9:
        chamfer6.Add(CHAMFER6_SIZE, CHAMFER6_SIZE2, e.wrapped, chamfer6_side_9[0].wrapped)  # the first distance lies on this face
    for e in chamfer6_edges_10:
        chamfer6.Add(CHAMFER6_SIZE, CHAMFER6_SIZE2, e.wrapped, chamfer6_side_10[0].wrapped)  # the first distance lies on this face
    for e in chamfer6_edges_11:
        chamfer6.Add(CHAMFER6_SIZE, CHAMFER6_SIZE2, e.wrapped, chamfer6_side_11[0].wrapped)  # the first distance lies on this face
    for e in chamfer6_edges_12:
        chamfer6.Add(CHAMFER6_SIZE, CHAMFER6_SIZE2, e.wrapped, chamfer6_side_12[0].wrapped)  # the first distance lies on this face
    for e in chamfer6_edges_13:
        chamfer6.Add(CHAMFER6_SIZE, CHAMFER6_SIZE2, e.wrapped, chamfer6_side_13[0].wrapped)  # the first distance lies on this face
    for e in chamfer6_edges_14:
        chamfer6.Add(CHAMFER6_SIZE, CHAMFER6_SIZE2, e.wrapped, chamfer6_side_14[0].wrapped)  # the first distance lies on this face
    for e in chamfer6_edges_15:
        chamfer6.Add(CHAMFER6_SIZE, CHAMFER6_SIZE2, e.wrapped, chamfer6_side_15[0].wrapped)  # the first distance lies on this face
    for e in chamfer6_edges_16:
        chamfer6.Add(CHAMFER6_SIZE, CHAMFER6_SIZE2, e.wrapped, chamfer6_side_16[0].wrapped)  # the first distance lies on this face
    for e in chamfer6_edges_17:
        chamfer6.Add(CHAMFER6_SIZE, CHAMFER6_SIZE2, e.wrapped, chamfer6_side_17[0].wrapped)  # the first distance lies on this face
    for e in chamfer6_edges_18:
        chamfer6.Add(CHAMFER6_SIZE, CHAMFER6_SIZE2, e.wrapped, chamfer6_side_18[0].wrapped)  # the first distance lies on this face
    for e in chamfer6_edges_19:
        chamfer6.Add(CHAMFER6_SIZE, CHAMFER6_SIZE2, e.wrapped, chamfer6_side_19[0].wrapped)  # the first distance lies on this face
    add(Compound.cast(chamfer6.Shape()), mode=Mode.REPLACE)

    # Fillet5
    fillet5_edges = [part.edges().sort_by_distance(p)[0] for p in [
        (4.5, -3, 81.3),
        (-4.5, -3, 81.3),
        (-4.5, -3, 58.7),
        (4.5, -3, 58.7),
    ]]
    fillet(fillet5_edges, radius=FILLET5_R)


solid = part.part
